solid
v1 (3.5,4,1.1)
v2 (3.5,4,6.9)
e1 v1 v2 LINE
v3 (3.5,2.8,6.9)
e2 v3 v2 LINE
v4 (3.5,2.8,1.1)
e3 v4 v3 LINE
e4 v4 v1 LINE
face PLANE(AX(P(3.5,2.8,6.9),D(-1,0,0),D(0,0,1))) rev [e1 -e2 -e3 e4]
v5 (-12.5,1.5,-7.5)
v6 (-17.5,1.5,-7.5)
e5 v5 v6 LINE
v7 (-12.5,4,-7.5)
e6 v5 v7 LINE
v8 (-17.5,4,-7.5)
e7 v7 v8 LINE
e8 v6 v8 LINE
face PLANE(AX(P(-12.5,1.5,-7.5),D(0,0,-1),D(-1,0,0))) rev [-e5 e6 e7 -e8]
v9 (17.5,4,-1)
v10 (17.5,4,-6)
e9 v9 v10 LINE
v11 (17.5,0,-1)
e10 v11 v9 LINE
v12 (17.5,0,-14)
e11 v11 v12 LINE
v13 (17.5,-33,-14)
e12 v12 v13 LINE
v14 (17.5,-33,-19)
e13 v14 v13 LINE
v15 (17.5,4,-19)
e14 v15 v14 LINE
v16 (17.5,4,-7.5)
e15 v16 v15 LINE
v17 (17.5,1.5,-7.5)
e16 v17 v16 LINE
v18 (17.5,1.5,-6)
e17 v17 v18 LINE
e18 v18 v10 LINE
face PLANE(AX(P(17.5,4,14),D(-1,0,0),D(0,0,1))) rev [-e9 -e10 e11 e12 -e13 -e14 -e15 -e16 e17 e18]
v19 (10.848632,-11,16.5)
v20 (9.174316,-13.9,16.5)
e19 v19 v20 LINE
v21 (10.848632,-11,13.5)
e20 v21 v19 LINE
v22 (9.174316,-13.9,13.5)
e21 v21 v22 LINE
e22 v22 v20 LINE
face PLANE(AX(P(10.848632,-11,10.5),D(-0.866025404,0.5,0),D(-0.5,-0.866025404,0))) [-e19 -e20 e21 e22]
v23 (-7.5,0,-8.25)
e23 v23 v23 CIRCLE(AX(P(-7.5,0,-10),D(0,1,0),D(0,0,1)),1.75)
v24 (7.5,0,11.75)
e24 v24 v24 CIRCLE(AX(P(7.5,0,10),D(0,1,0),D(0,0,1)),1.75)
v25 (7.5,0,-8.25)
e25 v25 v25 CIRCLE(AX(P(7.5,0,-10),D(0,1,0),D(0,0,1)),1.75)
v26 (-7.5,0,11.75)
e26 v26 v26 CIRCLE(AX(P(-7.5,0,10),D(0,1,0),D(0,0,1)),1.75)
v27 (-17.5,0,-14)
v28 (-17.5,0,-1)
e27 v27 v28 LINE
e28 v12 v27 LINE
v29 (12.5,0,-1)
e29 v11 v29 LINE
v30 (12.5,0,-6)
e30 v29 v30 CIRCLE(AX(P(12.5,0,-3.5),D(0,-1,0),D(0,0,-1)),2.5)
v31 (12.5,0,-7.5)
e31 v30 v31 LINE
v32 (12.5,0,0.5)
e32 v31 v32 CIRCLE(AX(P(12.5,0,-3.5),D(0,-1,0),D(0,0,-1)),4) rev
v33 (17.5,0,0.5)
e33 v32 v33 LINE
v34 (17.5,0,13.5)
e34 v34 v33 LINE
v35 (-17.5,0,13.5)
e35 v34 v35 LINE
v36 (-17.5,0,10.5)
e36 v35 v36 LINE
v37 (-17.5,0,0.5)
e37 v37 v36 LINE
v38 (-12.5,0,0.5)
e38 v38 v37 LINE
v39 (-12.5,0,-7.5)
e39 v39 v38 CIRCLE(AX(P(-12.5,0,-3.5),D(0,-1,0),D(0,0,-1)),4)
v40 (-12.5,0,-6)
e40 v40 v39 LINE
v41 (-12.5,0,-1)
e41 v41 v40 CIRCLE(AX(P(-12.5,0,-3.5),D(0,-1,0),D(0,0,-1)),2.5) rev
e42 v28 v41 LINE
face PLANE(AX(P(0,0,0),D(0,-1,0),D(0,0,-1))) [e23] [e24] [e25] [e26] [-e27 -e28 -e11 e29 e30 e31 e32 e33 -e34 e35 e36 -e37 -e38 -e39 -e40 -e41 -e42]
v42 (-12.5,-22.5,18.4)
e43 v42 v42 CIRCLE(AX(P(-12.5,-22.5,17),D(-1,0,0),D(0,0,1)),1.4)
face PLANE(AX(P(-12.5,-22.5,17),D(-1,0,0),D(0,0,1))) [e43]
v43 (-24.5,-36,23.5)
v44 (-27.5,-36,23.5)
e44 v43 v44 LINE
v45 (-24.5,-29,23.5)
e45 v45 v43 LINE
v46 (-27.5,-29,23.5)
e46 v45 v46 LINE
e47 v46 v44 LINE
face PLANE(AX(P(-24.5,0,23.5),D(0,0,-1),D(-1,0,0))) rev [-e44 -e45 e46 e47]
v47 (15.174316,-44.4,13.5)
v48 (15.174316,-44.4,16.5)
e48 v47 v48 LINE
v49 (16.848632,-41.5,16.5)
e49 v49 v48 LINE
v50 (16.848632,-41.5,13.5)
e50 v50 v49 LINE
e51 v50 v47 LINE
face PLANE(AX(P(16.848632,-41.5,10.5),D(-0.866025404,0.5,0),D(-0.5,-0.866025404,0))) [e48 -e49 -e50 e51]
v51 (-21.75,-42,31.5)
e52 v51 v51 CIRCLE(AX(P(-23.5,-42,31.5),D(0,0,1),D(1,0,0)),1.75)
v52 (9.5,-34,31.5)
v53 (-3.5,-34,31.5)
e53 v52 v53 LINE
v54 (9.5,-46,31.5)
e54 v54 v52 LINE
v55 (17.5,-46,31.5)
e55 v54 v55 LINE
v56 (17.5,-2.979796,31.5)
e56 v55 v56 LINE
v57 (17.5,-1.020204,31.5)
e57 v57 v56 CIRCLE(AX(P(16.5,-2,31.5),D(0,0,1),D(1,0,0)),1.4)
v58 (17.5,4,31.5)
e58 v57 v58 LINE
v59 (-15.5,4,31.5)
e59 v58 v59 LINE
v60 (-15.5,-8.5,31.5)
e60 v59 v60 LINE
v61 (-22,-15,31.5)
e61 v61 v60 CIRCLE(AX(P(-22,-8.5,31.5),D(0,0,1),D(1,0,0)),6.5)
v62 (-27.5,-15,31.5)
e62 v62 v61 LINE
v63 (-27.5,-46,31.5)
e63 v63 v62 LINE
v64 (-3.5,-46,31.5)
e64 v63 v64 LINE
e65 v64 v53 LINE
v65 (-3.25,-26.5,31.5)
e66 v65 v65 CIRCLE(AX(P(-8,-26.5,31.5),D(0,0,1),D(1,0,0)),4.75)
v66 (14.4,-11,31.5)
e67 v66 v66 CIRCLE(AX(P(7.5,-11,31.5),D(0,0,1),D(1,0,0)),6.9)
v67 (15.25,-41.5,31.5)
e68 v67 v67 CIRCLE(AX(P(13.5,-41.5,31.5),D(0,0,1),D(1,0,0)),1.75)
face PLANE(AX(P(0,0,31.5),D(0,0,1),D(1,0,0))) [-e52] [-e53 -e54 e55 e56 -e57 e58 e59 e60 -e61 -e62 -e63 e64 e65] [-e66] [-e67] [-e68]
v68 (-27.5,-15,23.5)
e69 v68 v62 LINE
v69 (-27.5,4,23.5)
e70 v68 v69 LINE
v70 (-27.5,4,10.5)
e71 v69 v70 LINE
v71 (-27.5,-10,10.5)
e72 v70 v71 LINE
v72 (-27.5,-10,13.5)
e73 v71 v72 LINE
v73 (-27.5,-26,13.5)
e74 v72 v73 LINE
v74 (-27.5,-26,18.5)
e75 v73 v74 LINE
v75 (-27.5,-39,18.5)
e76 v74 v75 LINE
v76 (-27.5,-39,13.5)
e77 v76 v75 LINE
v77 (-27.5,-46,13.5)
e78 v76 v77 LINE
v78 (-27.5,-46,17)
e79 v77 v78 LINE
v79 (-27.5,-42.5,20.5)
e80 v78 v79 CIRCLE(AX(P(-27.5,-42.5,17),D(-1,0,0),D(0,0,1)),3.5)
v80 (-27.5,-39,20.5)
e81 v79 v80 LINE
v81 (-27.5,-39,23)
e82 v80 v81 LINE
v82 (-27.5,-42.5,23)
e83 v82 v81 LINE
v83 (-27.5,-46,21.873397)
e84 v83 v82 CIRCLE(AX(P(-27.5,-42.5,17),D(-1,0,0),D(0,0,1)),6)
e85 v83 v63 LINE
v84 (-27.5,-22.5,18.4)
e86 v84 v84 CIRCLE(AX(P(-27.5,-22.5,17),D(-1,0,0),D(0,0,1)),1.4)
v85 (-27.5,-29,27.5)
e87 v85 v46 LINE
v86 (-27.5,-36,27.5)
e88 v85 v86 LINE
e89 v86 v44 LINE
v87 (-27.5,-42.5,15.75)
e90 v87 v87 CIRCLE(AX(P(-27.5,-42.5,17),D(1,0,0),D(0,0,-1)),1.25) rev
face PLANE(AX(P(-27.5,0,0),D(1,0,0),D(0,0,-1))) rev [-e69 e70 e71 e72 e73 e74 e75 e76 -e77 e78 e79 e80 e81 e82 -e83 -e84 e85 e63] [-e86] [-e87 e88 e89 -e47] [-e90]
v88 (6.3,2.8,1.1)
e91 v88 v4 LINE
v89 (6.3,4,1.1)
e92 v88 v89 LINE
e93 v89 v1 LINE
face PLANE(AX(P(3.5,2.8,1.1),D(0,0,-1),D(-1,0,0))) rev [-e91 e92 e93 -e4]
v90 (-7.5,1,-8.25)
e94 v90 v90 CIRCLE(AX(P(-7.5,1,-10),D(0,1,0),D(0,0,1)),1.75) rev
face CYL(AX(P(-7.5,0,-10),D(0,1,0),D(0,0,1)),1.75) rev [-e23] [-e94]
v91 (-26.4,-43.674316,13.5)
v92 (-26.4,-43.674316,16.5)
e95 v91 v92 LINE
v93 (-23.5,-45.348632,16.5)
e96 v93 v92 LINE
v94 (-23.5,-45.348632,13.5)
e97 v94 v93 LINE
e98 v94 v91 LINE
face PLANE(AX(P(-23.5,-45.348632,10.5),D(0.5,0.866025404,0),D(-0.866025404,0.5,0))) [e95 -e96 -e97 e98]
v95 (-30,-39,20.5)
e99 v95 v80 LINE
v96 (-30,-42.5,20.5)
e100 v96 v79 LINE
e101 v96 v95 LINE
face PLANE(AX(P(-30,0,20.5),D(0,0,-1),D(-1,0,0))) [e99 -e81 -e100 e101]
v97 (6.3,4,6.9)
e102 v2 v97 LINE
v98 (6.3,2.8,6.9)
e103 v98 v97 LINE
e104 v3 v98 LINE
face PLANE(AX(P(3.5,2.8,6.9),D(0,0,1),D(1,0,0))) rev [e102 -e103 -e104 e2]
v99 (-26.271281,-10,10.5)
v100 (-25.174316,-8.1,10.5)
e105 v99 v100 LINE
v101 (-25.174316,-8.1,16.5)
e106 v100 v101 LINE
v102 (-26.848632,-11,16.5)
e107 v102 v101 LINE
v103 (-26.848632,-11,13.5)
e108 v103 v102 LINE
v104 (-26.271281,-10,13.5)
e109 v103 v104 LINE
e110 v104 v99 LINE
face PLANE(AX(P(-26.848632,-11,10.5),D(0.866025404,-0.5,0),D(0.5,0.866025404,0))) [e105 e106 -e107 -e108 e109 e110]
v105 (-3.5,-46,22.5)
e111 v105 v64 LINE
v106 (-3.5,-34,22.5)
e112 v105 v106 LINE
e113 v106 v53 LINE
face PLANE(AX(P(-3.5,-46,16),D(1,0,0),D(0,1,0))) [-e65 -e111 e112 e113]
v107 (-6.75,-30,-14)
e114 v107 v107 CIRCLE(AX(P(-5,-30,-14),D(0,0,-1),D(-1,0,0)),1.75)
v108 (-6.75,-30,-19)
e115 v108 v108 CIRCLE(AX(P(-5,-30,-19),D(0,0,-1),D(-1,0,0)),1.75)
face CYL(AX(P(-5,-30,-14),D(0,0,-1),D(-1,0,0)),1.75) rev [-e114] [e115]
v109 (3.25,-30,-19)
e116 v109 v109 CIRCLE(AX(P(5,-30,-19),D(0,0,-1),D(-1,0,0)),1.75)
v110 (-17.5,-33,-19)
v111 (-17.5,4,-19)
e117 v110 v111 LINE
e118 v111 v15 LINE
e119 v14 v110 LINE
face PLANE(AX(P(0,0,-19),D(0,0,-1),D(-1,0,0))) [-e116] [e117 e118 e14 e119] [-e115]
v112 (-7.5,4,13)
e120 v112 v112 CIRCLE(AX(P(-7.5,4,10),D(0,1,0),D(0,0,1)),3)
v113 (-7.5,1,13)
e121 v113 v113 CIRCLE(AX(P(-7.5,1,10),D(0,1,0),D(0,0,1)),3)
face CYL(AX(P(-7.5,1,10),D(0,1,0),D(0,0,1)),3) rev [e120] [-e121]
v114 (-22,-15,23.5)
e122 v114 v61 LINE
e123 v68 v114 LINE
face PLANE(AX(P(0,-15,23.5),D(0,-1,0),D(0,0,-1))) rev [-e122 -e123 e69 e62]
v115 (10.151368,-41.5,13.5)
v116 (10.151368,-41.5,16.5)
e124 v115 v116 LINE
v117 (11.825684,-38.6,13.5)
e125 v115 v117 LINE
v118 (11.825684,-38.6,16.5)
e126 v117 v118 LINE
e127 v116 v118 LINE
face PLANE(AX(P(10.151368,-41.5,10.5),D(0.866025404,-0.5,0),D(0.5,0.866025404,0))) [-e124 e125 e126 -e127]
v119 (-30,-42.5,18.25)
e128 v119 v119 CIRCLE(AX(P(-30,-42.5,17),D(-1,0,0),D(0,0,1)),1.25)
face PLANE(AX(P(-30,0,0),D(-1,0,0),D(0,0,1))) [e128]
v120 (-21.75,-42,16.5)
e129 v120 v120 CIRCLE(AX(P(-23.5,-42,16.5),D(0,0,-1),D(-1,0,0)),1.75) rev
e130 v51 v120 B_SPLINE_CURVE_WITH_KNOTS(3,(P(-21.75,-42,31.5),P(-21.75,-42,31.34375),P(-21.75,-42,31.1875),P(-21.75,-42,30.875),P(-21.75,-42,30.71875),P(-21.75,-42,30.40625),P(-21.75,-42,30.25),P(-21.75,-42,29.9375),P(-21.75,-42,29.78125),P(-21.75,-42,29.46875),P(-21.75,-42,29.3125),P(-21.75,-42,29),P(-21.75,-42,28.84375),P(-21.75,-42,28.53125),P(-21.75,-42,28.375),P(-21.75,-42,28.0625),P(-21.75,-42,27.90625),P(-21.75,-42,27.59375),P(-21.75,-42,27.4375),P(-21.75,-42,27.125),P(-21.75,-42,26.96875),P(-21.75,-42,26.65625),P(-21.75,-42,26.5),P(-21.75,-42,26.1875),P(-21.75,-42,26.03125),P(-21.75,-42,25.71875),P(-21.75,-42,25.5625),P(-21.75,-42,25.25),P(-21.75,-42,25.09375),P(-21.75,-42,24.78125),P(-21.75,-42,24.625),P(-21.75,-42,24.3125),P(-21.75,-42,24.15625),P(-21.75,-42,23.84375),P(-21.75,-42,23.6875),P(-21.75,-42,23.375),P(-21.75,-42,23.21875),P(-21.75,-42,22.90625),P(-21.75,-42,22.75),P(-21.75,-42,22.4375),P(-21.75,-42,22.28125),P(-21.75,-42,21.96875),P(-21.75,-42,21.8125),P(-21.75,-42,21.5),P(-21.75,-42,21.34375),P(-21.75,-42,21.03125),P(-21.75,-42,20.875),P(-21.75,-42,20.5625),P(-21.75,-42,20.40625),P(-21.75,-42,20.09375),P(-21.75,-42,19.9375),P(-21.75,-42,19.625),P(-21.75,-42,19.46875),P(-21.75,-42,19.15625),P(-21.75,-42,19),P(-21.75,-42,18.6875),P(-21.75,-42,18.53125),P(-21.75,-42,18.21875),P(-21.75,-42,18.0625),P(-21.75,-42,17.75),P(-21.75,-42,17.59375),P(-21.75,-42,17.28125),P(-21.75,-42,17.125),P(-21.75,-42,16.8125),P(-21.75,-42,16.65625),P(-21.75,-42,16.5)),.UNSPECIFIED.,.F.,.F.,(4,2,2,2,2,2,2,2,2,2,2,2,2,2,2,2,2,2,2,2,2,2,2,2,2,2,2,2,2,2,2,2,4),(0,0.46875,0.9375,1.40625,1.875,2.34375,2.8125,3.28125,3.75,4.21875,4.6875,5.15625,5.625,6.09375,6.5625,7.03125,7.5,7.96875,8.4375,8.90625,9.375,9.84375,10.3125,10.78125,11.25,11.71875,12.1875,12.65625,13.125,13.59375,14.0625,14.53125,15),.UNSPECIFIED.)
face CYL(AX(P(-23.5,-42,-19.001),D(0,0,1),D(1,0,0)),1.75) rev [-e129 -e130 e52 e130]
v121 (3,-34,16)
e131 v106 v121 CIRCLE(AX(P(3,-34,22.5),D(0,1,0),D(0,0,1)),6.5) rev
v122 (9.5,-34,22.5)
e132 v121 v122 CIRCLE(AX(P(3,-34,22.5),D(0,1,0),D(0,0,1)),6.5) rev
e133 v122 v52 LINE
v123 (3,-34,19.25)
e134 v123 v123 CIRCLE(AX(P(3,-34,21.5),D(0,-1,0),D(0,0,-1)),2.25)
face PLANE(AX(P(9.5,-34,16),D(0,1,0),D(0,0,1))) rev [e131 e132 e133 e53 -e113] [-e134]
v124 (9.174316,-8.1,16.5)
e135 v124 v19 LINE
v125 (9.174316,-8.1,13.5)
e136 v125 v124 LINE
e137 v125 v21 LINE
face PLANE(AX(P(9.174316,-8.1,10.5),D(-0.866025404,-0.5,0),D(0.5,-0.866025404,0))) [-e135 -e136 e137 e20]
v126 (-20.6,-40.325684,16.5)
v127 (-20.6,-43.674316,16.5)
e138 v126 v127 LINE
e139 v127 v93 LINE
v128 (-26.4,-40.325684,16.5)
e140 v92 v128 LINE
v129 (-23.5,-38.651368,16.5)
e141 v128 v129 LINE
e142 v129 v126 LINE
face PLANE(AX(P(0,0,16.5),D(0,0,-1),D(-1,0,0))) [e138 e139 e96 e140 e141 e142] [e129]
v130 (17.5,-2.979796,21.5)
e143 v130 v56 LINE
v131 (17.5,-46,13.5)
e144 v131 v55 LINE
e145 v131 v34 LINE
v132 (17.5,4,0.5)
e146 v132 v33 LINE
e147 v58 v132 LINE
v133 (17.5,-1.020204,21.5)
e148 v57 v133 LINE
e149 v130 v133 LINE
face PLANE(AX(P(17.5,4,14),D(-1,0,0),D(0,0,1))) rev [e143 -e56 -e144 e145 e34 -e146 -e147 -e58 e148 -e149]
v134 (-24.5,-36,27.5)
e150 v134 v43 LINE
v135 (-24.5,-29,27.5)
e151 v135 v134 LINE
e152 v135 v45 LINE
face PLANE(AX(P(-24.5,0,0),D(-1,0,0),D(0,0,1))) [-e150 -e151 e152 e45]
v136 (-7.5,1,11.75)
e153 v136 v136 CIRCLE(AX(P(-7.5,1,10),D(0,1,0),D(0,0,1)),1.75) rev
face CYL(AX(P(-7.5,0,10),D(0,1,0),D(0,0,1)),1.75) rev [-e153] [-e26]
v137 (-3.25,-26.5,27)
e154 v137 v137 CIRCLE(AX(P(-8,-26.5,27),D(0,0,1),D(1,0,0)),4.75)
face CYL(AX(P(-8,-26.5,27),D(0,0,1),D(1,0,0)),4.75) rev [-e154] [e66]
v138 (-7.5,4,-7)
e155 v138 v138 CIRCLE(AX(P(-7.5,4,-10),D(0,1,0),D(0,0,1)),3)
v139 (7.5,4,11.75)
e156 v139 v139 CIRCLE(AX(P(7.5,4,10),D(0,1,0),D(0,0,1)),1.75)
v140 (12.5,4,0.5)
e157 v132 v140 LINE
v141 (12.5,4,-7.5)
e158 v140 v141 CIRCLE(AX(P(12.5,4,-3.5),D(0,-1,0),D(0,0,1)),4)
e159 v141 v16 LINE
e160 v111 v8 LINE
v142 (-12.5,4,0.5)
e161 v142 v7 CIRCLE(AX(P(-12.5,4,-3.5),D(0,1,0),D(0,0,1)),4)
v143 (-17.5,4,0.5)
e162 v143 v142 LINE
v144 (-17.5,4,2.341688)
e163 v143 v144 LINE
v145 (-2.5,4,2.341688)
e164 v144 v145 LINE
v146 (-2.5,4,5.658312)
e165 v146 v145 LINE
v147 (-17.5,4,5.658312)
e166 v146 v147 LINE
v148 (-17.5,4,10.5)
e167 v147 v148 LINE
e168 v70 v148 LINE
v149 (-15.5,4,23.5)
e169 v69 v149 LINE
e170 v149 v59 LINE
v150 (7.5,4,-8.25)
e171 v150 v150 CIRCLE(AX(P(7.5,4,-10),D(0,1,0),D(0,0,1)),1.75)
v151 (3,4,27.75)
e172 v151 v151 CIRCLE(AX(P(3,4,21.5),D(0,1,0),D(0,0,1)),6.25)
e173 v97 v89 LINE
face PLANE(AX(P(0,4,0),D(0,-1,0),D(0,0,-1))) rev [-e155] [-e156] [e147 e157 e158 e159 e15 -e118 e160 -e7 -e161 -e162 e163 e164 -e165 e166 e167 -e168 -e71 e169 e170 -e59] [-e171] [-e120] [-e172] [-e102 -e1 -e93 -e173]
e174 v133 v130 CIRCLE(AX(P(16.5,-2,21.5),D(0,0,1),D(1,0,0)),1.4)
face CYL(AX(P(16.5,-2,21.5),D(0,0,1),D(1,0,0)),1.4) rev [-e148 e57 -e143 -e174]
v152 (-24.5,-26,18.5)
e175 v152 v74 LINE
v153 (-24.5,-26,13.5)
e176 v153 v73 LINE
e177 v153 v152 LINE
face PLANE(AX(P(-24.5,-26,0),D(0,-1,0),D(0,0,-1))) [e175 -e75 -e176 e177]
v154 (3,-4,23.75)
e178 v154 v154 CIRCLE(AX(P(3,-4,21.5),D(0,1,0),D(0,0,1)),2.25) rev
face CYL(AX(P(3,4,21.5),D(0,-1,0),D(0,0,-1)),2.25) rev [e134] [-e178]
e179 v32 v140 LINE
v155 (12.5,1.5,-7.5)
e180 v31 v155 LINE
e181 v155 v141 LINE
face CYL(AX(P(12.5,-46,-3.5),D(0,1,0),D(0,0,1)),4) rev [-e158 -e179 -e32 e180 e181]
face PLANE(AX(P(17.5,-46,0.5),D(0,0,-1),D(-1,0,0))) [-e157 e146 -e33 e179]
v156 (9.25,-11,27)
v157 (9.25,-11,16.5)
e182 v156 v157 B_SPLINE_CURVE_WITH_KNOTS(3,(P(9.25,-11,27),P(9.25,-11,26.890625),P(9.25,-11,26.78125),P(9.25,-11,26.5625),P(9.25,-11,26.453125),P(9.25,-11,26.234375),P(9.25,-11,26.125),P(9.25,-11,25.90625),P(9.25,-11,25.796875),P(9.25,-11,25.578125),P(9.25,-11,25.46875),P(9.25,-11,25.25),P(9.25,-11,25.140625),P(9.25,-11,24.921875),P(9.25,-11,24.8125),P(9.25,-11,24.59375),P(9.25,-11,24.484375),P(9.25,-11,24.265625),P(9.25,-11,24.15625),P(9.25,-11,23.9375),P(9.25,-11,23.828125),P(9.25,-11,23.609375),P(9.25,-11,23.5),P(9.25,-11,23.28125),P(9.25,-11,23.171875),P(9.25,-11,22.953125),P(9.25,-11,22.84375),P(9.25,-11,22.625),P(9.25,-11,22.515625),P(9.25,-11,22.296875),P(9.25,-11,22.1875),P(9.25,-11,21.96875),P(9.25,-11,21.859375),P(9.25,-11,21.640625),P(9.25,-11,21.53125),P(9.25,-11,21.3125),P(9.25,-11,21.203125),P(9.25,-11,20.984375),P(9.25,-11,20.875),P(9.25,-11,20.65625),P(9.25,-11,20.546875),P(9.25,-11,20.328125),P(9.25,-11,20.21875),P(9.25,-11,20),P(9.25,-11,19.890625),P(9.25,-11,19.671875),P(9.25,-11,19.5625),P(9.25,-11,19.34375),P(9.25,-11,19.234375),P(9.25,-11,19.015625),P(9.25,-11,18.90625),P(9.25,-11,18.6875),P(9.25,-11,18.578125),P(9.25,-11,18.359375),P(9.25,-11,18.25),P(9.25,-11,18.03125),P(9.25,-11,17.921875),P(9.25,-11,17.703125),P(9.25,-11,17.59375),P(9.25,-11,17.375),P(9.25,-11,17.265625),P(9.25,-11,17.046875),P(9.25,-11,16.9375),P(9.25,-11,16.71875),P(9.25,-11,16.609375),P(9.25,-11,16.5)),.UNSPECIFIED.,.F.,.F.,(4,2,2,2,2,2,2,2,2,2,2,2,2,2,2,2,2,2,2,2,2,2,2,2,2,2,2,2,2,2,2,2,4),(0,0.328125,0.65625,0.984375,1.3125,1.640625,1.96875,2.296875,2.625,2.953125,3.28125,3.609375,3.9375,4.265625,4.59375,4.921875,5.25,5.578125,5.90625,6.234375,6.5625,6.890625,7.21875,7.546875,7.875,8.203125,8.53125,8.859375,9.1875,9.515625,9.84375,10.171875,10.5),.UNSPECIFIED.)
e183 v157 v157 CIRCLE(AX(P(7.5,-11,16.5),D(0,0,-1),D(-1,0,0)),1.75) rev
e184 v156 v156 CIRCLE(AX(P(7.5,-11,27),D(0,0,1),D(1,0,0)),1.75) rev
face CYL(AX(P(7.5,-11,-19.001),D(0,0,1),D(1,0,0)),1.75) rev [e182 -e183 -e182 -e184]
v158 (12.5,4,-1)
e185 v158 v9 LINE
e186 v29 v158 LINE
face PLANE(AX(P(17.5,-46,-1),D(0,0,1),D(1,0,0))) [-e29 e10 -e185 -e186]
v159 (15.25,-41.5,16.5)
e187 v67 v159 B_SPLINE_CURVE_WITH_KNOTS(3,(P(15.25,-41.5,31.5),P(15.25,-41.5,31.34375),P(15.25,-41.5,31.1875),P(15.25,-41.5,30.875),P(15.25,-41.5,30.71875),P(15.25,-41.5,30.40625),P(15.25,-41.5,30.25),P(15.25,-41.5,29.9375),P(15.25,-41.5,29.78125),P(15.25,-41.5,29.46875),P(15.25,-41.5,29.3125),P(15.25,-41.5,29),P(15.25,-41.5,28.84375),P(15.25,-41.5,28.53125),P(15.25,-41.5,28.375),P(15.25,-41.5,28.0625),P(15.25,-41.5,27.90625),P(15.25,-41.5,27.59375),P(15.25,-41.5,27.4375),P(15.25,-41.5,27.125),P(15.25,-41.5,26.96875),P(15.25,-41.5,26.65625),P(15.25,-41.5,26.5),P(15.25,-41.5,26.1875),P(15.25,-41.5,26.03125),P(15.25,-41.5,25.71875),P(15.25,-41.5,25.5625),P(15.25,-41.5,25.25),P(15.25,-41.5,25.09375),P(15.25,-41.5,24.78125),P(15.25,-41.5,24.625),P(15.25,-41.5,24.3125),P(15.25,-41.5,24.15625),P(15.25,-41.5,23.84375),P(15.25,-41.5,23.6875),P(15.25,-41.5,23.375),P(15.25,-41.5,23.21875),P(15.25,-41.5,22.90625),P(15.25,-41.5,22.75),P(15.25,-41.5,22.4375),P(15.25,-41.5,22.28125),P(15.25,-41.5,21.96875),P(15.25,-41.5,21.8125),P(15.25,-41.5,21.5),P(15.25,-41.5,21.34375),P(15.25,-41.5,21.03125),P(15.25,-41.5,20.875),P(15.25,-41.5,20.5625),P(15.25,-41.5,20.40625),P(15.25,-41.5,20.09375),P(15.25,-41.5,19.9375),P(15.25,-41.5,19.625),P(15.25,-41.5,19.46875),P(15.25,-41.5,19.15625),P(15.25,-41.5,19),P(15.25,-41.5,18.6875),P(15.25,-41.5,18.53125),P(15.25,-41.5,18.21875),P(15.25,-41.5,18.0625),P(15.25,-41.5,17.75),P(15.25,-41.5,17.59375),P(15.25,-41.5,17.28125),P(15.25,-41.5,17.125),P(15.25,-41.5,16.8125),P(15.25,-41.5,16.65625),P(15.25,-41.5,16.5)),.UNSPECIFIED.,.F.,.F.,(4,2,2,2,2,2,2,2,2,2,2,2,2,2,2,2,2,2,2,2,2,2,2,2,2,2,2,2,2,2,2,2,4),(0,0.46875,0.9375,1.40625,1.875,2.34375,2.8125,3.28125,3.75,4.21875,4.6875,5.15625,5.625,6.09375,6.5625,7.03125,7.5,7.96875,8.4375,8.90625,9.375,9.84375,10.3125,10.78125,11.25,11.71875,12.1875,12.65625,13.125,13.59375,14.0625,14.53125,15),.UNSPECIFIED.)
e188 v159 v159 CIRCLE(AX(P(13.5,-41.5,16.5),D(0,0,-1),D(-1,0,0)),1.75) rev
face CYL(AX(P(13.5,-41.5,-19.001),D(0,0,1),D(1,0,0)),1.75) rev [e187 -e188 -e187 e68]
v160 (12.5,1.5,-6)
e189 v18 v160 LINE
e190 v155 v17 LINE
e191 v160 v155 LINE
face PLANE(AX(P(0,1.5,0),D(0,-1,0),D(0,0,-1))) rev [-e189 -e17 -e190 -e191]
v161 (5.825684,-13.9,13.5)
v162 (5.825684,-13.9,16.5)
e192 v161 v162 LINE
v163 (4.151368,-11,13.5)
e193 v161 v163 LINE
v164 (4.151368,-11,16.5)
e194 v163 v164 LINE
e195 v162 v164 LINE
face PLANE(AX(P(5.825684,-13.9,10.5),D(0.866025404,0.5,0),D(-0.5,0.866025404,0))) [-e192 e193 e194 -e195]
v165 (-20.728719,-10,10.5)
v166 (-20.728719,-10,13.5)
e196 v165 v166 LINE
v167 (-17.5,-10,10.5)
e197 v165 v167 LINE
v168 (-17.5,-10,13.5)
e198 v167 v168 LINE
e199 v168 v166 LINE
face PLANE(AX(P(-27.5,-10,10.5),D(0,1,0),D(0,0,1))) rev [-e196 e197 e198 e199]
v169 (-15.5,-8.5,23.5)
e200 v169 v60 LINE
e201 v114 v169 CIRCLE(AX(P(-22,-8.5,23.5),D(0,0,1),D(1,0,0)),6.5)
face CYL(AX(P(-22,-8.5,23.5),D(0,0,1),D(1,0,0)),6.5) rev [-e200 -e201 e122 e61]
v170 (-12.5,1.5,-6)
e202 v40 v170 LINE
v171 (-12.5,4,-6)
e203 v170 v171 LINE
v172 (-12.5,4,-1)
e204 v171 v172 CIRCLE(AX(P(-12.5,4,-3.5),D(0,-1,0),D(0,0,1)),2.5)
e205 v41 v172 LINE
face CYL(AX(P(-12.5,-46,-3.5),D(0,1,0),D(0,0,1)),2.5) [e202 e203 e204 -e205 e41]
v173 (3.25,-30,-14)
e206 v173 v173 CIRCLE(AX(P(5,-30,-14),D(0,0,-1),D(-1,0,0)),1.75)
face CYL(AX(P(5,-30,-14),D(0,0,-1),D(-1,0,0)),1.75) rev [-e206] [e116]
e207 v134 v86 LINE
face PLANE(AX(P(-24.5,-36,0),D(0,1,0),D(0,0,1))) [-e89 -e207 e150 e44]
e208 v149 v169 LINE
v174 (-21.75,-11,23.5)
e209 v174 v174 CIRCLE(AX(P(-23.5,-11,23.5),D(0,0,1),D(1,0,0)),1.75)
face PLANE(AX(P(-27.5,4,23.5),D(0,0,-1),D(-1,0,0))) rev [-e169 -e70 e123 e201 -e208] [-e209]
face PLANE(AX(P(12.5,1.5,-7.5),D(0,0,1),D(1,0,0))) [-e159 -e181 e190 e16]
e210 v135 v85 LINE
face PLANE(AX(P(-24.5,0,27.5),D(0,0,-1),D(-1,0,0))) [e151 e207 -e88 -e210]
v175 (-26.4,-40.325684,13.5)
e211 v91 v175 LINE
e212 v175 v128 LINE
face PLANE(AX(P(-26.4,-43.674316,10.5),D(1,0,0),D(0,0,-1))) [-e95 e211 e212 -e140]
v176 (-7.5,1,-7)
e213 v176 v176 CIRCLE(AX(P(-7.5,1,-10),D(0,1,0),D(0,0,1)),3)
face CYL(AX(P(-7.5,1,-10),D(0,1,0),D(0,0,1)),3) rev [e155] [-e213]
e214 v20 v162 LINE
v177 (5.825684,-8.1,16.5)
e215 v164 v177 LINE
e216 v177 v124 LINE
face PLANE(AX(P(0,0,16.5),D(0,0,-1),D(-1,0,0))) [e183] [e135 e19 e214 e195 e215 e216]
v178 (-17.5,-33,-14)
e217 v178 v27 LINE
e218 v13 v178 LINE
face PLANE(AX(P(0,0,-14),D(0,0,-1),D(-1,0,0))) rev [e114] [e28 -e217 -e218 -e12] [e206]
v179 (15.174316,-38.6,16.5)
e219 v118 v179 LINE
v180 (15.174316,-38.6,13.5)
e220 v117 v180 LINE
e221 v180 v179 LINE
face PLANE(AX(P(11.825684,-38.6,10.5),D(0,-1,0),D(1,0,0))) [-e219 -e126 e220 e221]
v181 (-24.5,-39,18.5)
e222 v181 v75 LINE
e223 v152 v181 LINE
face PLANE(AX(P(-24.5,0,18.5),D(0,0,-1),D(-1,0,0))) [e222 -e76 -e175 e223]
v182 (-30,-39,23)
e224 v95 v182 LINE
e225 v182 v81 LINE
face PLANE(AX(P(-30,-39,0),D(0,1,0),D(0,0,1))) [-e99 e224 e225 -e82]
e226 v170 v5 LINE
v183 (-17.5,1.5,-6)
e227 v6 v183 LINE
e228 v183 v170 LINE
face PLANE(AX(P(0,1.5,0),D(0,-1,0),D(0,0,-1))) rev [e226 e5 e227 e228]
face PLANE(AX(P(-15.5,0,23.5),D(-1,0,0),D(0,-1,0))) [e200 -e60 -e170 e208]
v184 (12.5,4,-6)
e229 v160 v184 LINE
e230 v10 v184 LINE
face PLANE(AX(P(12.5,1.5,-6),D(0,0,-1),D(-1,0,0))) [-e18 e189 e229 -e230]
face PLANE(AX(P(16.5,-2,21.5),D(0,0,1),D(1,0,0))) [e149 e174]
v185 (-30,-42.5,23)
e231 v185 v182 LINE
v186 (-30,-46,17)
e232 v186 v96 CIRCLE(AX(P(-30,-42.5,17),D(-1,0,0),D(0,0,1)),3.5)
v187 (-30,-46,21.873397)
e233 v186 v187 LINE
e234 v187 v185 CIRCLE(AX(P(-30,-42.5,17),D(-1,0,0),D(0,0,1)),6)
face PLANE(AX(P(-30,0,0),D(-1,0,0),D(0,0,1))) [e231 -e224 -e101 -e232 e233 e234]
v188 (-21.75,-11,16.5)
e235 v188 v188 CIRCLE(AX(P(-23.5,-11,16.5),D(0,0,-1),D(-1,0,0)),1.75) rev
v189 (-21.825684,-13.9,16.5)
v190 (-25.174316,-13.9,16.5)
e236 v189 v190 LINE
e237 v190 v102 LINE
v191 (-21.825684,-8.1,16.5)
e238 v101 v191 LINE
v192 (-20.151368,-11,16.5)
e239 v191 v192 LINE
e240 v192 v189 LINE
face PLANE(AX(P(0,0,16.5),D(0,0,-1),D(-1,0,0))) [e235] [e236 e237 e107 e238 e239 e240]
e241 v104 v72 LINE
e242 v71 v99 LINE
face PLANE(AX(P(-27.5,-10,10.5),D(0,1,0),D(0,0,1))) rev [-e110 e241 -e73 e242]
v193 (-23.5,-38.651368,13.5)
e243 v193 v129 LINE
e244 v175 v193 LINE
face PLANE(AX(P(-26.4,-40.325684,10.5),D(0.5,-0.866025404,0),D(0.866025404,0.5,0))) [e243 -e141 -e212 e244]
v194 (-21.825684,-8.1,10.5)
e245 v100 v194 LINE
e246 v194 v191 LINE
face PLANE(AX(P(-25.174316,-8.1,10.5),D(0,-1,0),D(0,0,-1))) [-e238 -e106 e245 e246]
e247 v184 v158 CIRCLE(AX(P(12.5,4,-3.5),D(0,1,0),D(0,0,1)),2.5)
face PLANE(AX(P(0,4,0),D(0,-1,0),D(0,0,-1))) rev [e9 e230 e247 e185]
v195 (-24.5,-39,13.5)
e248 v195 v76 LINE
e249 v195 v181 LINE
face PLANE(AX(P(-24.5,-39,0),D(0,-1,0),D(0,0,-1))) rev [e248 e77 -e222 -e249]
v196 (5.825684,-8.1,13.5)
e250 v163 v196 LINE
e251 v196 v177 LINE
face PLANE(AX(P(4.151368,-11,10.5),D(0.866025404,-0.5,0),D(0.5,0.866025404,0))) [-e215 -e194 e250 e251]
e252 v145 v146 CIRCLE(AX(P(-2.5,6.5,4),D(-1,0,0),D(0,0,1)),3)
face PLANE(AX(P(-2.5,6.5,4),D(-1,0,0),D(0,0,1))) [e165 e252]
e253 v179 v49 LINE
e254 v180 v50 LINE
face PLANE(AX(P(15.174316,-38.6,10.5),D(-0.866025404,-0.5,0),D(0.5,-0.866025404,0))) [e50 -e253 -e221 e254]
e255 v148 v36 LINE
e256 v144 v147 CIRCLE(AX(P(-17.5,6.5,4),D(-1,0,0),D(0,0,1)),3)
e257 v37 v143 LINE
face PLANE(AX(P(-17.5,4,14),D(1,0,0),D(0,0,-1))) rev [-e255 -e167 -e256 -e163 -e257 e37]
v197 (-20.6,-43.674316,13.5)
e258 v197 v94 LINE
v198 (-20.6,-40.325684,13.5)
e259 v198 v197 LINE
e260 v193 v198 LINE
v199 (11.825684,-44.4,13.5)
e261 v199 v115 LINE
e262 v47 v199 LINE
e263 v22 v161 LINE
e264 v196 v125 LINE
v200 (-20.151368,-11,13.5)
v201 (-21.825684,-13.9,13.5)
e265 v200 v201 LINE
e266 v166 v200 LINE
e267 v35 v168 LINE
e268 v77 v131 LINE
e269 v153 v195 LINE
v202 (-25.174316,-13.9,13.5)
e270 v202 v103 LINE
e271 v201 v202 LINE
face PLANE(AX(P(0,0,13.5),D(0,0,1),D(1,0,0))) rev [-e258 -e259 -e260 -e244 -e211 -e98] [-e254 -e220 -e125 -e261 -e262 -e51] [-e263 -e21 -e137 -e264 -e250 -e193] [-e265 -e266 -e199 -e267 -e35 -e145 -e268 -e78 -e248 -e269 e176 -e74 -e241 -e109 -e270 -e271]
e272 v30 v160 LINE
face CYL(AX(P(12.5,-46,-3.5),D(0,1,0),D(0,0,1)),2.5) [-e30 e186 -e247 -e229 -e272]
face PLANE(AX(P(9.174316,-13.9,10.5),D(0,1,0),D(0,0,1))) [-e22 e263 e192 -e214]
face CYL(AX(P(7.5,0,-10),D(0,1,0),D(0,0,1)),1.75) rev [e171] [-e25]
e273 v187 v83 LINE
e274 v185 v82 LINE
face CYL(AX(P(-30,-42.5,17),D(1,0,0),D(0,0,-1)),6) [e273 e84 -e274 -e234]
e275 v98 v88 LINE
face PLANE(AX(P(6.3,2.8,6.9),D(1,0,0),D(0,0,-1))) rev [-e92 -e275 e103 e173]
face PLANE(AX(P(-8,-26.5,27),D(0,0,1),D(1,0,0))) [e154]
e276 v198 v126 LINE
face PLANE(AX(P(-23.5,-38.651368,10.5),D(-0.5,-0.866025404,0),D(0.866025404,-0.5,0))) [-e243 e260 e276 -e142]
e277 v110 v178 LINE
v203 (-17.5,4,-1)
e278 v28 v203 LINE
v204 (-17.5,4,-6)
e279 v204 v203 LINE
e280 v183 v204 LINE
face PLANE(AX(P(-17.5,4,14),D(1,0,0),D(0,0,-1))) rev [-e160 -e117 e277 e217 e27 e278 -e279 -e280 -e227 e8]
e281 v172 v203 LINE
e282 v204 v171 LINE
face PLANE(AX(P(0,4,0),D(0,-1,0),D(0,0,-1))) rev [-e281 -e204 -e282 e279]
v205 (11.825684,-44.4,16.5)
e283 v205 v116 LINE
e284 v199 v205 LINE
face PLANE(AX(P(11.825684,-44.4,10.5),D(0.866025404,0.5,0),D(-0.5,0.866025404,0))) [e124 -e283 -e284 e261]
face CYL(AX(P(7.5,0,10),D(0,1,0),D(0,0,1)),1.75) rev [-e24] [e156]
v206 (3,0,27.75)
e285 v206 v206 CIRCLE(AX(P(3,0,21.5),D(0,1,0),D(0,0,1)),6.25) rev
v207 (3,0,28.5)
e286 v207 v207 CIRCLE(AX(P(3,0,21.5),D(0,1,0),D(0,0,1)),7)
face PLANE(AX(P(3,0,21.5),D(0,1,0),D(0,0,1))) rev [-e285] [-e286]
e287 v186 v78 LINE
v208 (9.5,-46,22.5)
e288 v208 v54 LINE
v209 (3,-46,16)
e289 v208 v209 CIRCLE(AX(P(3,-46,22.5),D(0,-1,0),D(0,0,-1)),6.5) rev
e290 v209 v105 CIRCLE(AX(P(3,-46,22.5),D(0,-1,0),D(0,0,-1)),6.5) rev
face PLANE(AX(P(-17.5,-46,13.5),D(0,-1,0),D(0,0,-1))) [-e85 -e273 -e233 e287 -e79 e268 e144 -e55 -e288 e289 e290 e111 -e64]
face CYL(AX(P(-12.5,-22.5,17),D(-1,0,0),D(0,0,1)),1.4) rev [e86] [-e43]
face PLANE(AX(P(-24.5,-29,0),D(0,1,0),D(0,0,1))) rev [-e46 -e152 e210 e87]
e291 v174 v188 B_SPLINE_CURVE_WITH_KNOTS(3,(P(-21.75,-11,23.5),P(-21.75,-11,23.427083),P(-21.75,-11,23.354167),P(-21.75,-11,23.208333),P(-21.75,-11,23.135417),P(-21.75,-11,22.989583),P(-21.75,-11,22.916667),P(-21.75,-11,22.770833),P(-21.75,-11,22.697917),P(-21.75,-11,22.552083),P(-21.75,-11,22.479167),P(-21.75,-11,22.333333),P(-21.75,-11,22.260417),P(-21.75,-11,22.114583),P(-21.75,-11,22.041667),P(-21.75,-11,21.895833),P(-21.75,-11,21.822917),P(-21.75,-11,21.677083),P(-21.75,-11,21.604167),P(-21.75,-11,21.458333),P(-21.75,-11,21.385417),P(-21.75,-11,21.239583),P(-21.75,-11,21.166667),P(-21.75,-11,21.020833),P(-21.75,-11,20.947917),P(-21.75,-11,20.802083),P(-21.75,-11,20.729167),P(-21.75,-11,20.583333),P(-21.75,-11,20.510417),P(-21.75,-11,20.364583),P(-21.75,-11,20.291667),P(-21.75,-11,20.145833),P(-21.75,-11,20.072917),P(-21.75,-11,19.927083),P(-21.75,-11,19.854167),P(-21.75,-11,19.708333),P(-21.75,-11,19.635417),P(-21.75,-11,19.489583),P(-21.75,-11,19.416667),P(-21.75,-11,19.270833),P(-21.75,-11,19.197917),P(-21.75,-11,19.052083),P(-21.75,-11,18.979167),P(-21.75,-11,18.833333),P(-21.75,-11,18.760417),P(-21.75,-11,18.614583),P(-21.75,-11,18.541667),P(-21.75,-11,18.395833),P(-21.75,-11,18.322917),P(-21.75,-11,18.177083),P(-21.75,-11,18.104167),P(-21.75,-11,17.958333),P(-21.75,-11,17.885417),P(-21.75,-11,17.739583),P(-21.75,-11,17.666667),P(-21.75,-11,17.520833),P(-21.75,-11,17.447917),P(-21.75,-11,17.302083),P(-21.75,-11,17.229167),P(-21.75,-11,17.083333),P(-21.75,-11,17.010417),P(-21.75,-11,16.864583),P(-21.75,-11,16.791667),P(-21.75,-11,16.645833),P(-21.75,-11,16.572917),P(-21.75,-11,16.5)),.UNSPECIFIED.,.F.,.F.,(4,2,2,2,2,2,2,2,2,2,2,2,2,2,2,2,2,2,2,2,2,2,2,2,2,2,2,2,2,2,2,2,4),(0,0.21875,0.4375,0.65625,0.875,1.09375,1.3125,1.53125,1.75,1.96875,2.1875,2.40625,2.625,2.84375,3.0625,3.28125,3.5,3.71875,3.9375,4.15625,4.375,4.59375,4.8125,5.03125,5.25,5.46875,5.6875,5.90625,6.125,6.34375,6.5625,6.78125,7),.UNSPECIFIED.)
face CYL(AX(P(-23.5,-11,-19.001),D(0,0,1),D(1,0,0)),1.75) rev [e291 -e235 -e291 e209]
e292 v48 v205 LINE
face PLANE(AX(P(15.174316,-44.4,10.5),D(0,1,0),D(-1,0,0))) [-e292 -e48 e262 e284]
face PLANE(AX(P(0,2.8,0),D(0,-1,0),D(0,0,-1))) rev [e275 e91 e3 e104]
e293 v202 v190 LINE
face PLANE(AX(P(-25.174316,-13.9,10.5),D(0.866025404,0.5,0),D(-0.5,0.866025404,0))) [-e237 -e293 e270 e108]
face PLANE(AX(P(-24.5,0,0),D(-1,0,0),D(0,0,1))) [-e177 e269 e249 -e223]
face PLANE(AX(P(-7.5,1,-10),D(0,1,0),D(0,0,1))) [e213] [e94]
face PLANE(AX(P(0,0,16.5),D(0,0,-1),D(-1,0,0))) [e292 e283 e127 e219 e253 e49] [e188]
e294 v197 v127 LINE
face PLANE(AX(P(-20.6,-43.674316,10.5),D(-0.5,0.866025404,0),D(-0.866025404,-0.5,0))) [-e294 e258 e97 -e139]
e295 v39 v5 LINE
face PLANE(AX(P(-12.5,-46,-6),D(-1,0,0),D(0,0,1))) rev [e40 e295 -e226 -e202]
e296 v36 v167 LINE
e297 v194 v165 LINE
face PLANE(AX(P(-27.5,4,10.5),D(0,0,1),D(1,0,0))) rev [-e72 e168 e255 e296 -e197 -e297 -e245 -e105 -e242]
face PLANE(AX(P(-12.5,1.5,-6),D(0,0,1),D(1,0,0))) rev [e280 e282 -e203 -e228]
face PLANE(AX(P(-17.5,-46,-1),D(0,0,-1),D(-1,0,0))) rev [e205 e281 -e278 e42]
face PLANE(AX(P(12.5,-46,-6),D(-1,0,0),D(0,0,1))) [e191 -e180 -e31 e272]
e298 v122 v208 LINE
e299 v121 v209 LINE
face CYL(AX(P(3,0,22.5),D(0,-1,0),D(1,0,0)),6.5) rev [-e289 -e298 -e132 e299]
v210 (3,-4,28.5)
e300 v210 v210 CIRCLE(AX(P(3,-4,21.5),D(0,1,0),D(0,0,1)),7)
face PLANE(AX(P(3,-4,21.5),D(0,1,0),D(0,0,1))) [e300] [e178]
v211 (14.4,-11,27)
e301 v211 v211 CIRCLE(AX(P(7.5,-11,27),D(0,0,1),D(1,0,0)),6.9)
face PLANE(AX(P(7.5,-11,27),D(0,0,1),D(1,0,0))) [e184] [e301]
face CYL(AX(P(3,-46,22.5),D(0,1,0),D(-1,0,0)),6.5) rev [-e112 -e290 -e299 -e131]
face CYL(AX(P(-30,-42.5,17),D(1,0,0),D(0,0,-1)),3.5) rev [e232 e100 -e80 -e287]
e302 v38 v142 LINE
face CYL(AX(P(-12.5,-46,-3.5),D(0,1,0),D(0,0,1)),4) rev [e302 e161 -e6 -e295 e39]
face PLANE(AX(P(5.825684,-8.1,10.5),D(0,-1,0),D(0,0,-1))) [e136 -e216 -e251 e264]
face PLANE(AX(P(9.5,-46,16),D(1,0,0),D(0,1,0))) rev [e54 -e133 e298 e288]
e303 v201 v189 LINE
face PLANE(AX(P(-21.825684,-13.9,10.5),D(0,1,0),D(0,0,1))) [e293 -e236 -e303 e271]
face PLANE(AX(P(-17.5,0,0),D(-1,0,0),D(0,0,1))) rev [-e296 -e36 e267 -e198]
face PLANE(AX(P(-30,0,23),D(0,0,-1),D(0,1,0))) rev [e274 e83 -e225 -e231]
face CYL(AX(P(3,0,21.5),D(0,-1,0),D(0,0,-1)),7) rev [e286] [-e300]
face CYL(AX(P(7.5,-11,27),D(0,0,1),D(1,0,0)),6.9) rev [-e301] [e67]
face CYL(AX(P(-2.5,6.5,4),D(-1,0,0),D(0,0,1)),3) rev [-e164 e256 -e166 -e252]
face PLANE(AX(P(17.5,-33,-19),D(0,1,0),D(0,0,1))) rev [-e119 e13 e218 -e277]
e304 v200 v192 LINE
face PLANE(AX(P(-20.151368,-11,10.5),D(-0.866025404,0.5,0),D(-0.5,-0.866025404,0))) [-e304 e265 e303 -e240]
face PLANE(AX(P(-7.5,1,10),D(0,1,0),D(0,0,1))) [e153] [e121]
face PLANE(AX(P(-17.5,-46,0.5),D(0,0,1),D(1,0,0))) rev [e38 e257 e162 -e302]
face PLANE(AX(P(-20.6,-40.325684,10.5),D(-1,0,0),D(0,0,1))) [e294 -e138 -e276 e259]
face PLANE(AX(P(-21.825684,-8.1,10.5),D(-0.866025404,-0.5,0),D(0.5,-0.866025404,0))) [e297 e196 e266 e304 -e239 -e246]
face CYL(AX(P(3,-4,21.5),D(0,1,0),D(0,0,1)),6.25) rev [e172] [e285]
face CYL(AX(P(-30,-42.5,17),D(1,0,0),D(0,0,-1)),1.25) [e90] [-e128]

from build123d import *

# Parameters (mm, degrees)
SKETCH1_W                = 35
SKETCH1_H                = 28
BOSS_EXTRUDE1_DEPTH      = 4
SKETCH2_R                = 1.75
CUT_EXTRUDE1_DEPTH       = 23.765104876
BOSS_EXTRUDE2_DEPTH      = 17.5
BOSS_EXTRUDE2_DEPTH_BACK = 0.5
SKETCH3_W                = 35
SKETCH3_H                = 50
SKETCH7_W                = 35
SKETCH7_H                = 37
BOSS_EXTRUDE3_DEPTH      = 5
SKETCH10_R               = 1.75
CUT_EXTRUDE6_DEPTH       = 5
SKETCH24_W               = 18
SKETCH24_H               = 46
BOSS_EXTRUDE4_DEPTH      = 10
SKETCH37_W               = 13
SKETCH37_H               = 14
BOSS_EXTRUDE9_DEPTH      = 10
CUT_EXTRUDE19_REACH      = 75.638
SKETCH22_R               = 1.75
SKETCH22_3_R             = 6.9
SKETCH22_3_R_2           = 4.75
CUT_EXTRUDE20_DEPTH      = 4.5
SKETCH22_5_R             = 1.75
SKETCH22_5_W             = 2
SKETCH22_5_H             = 4
CUT_EXTRUDE24_DEPTH      = 8
SKETCH22_4_W             = 13
SKETCH22_4_H             = 12
CUT_EXTRUDE21_DEPTH      = 15.5
FILLET3_R                = 6.5
SKETCH26_R               = 2.25
CUT_EXTRUDE22_DEPTH      = 57.502212346
SKETCH27_R               = 6.25
CUT_EXTRUDE23_DEPTH      = 8
CUT_EXTRUDE25_DEPTH      = 3
CUT_EXTRUDE25_DEPTH_BACK = 3
SKETCH30_R               = 3
CUT_EXTRUDE26_DEPTH      = 3
CUT_EXTRUDE27_DEPTH      = 66.180518562
SKETCH32_W               = 5
SKETCH32_H               = 1.5
CUT_EXTRUDE28_DEPTH      = 2.5
SKETCH33_R               = 3
CUT_EXTRUDE29_DEPTH      = 15
SKETCH34_W               = 2.8
SKETCH34_H               = 5.8
CUT_EXTRUDE30_DEPTH      = 1.2
SKETCH38_R               = 7
CUT_EXTRUDE31_DEPTH      = 4
SKETCH39_W               = 5
SKETCH39_H               = 13
SKETCH39_W_2             = 4
SKETCH39_H_2             = 7
CUT_EXTRUDE32_DEPTH      = 3
SKETCH40_R               = 1.4
CUT_EXTRUDE33_DEPTH      = 15
SKETCH41_R               = 1.25
BOSS_EXTRUDE10_DEPTH     = 2.5
SKETCH42_R               = 1.4
CUT_EXTRUDE34_DEPTH      = 10


with BuildPart() as part:
    # Sketch1 → Boss-Extrude1 (new body)
    with BuildSketch(Plane(origin=(0, 0, 0), x_dir=(1, 0, 0), z_dir=(0, 1, 0))):
        Rectangle(SKETCH1_W, SKETCH1_H)
    extrude(amount=BOSS_EXTRUDE1_DEPTH)

    # Sketch2 → Cut-Extrude1 (cut, through all)
    with BuildSketch(Plane(origin=(0, 4, 0), x_dir=(1, 0, 0), z_dir=(0, 1, 0))):
        with Locations(Location((-7.5, -10, 0), (0, 0, 270))):
            Circle(SKETCH2_R)
        with Locations(Location((-7.5, 10, 0), (0, 0, 270))):
            Circle(SKETCH2_R)
        with Locations(Location((7.5, -10, 0), (0, 0, 270))):
            Circle(SKETCH2_R)
        with Locations(Location((7.5, 10, 0), (0, 0, 270))):
            Circle(SKETCH2_R)
    extrude(amount=-CUT_EXTRUDE1_DEPTH, mode=Mode.SUBTRACT)

    # Sketch3 → Boss-Extrude2 (add, two sides: drawn at the far end of the back side and taken through both)
    with BuildSketch(Plane.XY.offset(14).offset(-BOSS_EXTRUDE2_DEPTH_BACK)):
        with Locations((0, -21)):
            Rectangle(SKETCH3_W, SKETCH3_H)
    extrude(amount=BOSS_EXTRUDE2_DEPTH + BOSS_EXTRUDE2_DEPTH_BACK)

    # Sketch7 → Boss-Extrude3 (add)
    with BuildSketch(Plane(origin=(0, 0, -14), x_dir=(-1, 0, 0), z_dir=(0, 0, -1))):
        with Locations((0, -14.5)):
            Rectangle(SKETCH7_W, SKETCH7_H)
    extrude(amount=BOSS_EXTRUDE3_DEPTH)

    # Sketch10 → Cut-Extrude6 (cut)
    with BuildSketch(Plane(origin=(0, 0, -19), x_dir=(-1, 0, 0), z_dir=(0, 0, -1))):
        with Locations((-5, -30)):
            Circle(SKETCH10_R)
        with Locations((5, -30)):
            Circle(SKETCH10_R)
    extrude(amount=-CUT_EXTRUDE6_DEPTH, mode=Mode.SUBTRACT)

    # Sketch24 → Boss-Extrude4 (add)
    with BuildSketch(Plane.ZY.offset(17.5)):
        with Locations((22.5, -23)):
            Rectangle(SKETCH24_W, SKETCH24_H)
    extrude(amount=BOSS_EXTRUDE4_DEPTH)

    # Sketch37 → Boss-Extrude9 (add)
    with BuildSketch(Plane.ZY.offset(17.5)):
        with Locations((17, -3)):
            Rectangle(SKETCH37_W, SKETCH37_H)
    extrude(amount=BOSS_EXTRUDE9_DEPTH)

    # Sketch22 → Cut-Extrude19 (cut, up to next)
    with BuildSketch(Plane.XY.offset(31.5), mode=Mode.PRIVATE) as cut_extrude19_sk1:
        with Locations((-23.5, -42)):
            Circle(SKETCH22_R)
    cut_extrude19_tool1 = extrude(cut_extrude19_sk1.sketch, amount=-CUT_EXTRUDE19_REACH, mode=Mode.PRIVATE) & part.part
    # Sketch22 → Cut-Extrude19 (cut, up to next)
    with BuildSketch(Plane.XY.offset(31.5), mode=Mode.PRIVATE) as cut_extrude19_sk2:
        with Locations((13.5, -41.5)):
            Circle(SKETCH22_R)
    cut_extrude19_tool2 = extrude(cut_extrude19_sk2.sketch, amount=-CUT_EXTRUDE19_REACH, mode=Mode.PRIVATE) & part.part
    # Sketch22 → Cut-Extrude19 (cut, up to next)
    with BuildSketch(Plane.XY.offset(31.5), mode=Mode.PRIVATE) as cut_extrude19_sk3:
        with Locations((7.5, -11)):
            Circle(SKETCH22_R)
    cut_extrude19_tool3 = extrude(cut_extrude19_sk3.sketch, amount=-CUT_EXTRUDE19_REACH, mode=Mode.PRIVATE) & part.part
    # Sketch22 → Cut-Extrude19 (cut, up to next)
    with BuildSketch(Plane.XY.offset(31.5), mode=Mode.PRIVATE) as cut_extrude19_sk4:
        with Locations((-23.5, -11)):
            Circle(SKETCH22_R)
    cut_extrude19_tool4 = extrude(cut_extrude19_sk4.sketch, amount=-CUT_EXTRUDE19_REACH, mode=Mode.PRIVATE) & part.part
    add(cut_extrude19_tool1.solids().sort_by_distance((-23.5, -42, 31.5))[0], mode=Mode.SUBTRACT)
    add(cut_extrude19_tool2.solids().sort_by_distance((13.5, -41.5, 31.5))[0], mode=Mode.SUBTRACT)
    add(cut_extrude19_tool3.solids().sort_by_distance((7.5, -11, 31.5))[0], mode=Mode.SUBTRACT)
    add(cut_extrude19_tool4.solids().sort_by_distance((-23.5, -11, 31.5))[0], mode=Mode.SUBTRACT)

    # Sketch22<3> → Cut-Extrude20 (cut)
    with BuildSketch(Plane.XY.offset(31.5)):
        with Locations((7.5, -11)):
            Circle(SKETCH22_3_R)
        with Locations((-8, -26.5)):
            Circle(SKETCH22_3_R_2)
    extrude(amount=-CUT_EXTRUDE20_DEPTH, mode=Mode.SUBTRACT)

    # Sketch22<5> → Cut-Extrude24 (cut)
    # profile 1 of 2: a face of its own
    with BuildSketch(Plane.XY.offset(31.5)):
        with BuildLine():
            Line((-15.5, -8.5), (-15.5, 0))
            Line((-15.5, 0), (-17.5, 0))
            Line((-17.5, 0), (-27.5, 0))
            Line((-27.5, 0), (-27.5, -15))
            Line((-27.5, -15), (-22, -15))
            ThreePointArc((-22, -15), (-17.403805922, -13.096194078), (-15.5, -8.5))
        make_face()
        with Locations((-23.5, -11)):
            Circle(SKETCH22_5_R, mode=Mode.SUBTRACT)
    # profile 2 of 2: a face of its own
    with BuildSketch(Plane.XY.offset(31.5)):
        with Locations((-16.5, 2)):
            Rectangle(SKETCH22_5_W, SKETCH22_5_H)
    extrude(amount=-CUT_EXTRUDE24_DEPTH, mode=Mode.SUBTRACT)

    # Sketch22<4> → Cut-Extrude21 (cut)
    with BuildSketch(Plane.XY.offset(31.5)):
        with Locations((3, -40)):
            Rectangle(SKETCH22_4_W, SKETCH22_4_H)
    extrude(amount=-CUT_EXTRUDE21_DEPTH, mode=Mode.SUBTRACT)

    # Fillet3
    fillet3_edges = [part.edges().sort_by_distance(p)[0] for p in [
        (9.5, -40, 16),
        (-3.5, -40, 16),
    ]]
    fillet(fillet3_edges, radius=FILLET3_R - 0.0001)  # a hair under: the kernel refuses the full size

    # Sketch26 → Cut-Extrude22 (cut, through all)
    with BuildSketch(Plane.XZ.offset(34)):
        with Locations(Location((3, 21.5, 0), (0, 0, 270))):
            Circle(SKETCH26_R)
    extrude(amount=-CUT_EXTRUDE22_DEPTH, mode=Mode.SUBTRACT)

    # Sketch27 → Cut-Extrude23 (cut)
    with BuildSketch(Plane(origin=(0, 4, 0), x_dir=(1, 0, 0), z_dir=(0, 1, 0))):
        with Locations(Location((3, -21.5, 0), (0, 0, 270))):
            Circle(SKETCH27_R)
    extrude(amount=-CUT_EXTRUDE23_DEPTH, mode=Mode.SUBTRACT)

    # Sketch29 → Cut-Extrude25 (cut, two sides: drawn at the far end of the back side and taken through both)
    with BuildSketch(Plane(origin=(0, 0, 13.5), x_dir=(-1, 0, 0), z_dir=(0, 0, -1)).offset(-CUT_EXTRUDE25_DEPTH_BACK)):
        Polygon((-4.151368439, -11), (-5.825684219, -8.1), (-9.174315781, -8.1), (-10.848631561, -11), (-9.174315781, -13.9), (-5.825684219, -13.9), align=None)
        Polygon((20.151368439, -11), (21.825684219, -13.9), (25.174315781, -13.9), (26.848631561, -11), (25.174315781, -8.1), (21.825684219, -8.1), align=None)
        Polygon((-10.151368439, -41.5), (-11.825684219, -38.6), (-15.174315781, -38.6), (-16.848631561, -41.5), (-15.174315781, -44.4), (-11.825684219, -44.4), align=None)
        Polygon((23.5, -45.348631561), (26.4, -43.674315781), (26.4, -40.325684219), (23.5, -38.651368439), (20.6, -40.325684219), (20.6, -43.674315781), align=None)
    extrude(amount=CUT_EXTRUDE25_DEPTH + CUT_EXTRUDE25_DEPTH_BACK, mode=Mode.SUBTRACT)

    # Sketch30 → Cut-Extrude26 (cut)
    with BuildSketch(Plane(origin=(0, 4, 0), x_dir=(1, 0, 0), z_dir=(0, 1, 0))):
        with Locations(Location((-7.5, 10, 0), (0, 0, 270))):
            Circle(SKETCH30_R)
        with Locations(Location((-7.5, -10, 0), (0, 0, 270))):
            Circle(SKETCH30_R)
    extrude(amount=-CUT_EXTRUDE26_DEPTH, mode=Mode.SUBTRACT)

    # Sketch31 → Cut-Extrude27 (cut, through all)
    with BuildSketch(Plane(origin=(0, 4, 0), x_dir=(1, 0, 0), z_dir=(0, 1, 0))):
        with BuildLine():
            Line((-17.5, 1), (-12.5, 1))
            ThreePointArc((-12.5, 1), (-10, 3.5), (-12.5, 6))
            Line((-12.5, 6), (-12.5, 7.5))
            ThreePointArc((-12.5, 7.5), (-8.5, 3.5), (-12.5, -0.5))
            Line((-12.5, -0.5), (-17.5, -0.5))
            Line((-17.5, -0.5), (-17.5, 1))
        make_face()
    cut_extrude27 = extrude(amount=-CUT_EXTRUDE27_DEPTH, mode=Mode.SUBTRACT)

    # Sketch32 → Cut-Extrude28 (cut)
    with BuildSketch(Plane(origin=(0, 4, 0), x_dir=(1, 0, 0), z_dir=(0, 1, 0))):
        with Locations((-15, 6.75)):
            Rectangle(SKETCH32_W, SKETCH32_H)
    cut_extrude28 = extrude(amount=-CUT_EXTRUDE28_DEPTH, mode=Mode.SUBTRACT)

    # Sketch33 → Cut-Extrude29 (cut)
    with BuildSketch(Plane.ZY.offset(17.5)):
        with Locations((4, 6.5)):
            Circle(SKETCH33_R)
    extrude(amount=-CUT_EXTRUDE29_DEPTH, mode=Mode.SUBTRACT)

    # Sketch34 → Cut-Extrude30 (cut)
    with BuildSketch(Plane(origin=(0, 4, 0), x_dir=(1, 0, 0), z_dir=(0, 1, 0))):
        with Locations((4.9, -4)):
            Rectangle(SKETCH34_W, SKETCH34_H)
    extrude(amount=-CUT_EXTRUDE30_DEPTH, mode=Mode.SUBTRACT)

    # Mirror1: Cut-Extrude27, Cut-Extrude28 across plane
    add(cut_extrude27.mirror(Plane.ZY), mode=Mode.SUBTRACT)
    add(cut_extrude28.mirror(Plane.ZY), mode=Mode.SUBTRACT)

    # Sketch38 → Cut-Extrude31 (cut)
    with BuildSketch(Plane(origin=(0, -4, 0), x_dir=(1, 0, 0), z_dir=(0, 1, 0))):
        with Locations(Location((3, -21.5, 0), (0, 0, 270))):
            Circle(SKETCH38_R)
    extrude(amount=CUT_EXTRUDE31_DEPTH, mode=Mode.SUBTRACT)

    # Sketch39 → Cut-Extrude32 (cut)
    with BuildSketch(Plane.ZY.offset(27.5)):
        with Locations((16, -32.5)):
            Rectangle(SKETCH39_W, SKETCH39_H)
        with Locations((25.5, -32.5)):
            Rectangle(SKETCH39_W_2, SKETCH39_H_2)
    extrude(amount=-CUT_EXTRUDE32_DEPTH, mode=Mode.SUBTRACT)

    # Sketch40 → Cut-Extrude33 (cut)
    with BuildSketch(Plane.ZY.offset(27.5)):
        with Locations((17, -22.5)):
            Circle(SKETCH40_R)
    extrude(amount=-CUT_EXTRUDE33_DEPTH, mode=Mode.SUBTRACT)

    # Sketch41 → Boss-Extrude10 (add)
    with BuildSketch(Plane.ZY.offset(27.5)):
        with Locations(Location((17, -42.5, 0), (0, 0, 180))):
            Circle(SKETCH41_R)
        with BuildLine():
            Line((20.5, -39), (20.5, -42.5))
            ThreePointArc((20.5, -42.5), (19.474873734, -44.974873734), (17, -46))
            Line((17, -46), (21.873397172, -46))
            ThreePointArc((21.873397172, -46), (22.711408891, -44.338425545), (23, -42.5))
            Line((23, -42.5), (23, -39))
            Line((23, -39), (20.5, -39))
        make_face()
    extrude(amount=BOSS_EXTRUDE10_DEPTH)

    # Sketch42 → Cut-Extrude34 (cut)
    with BuildSketch(Plane.XY.offset(31.5)):
        with Locations((16.5, -2)):
            Circle(SKETCH42_R)
    extrude(amount=-CUT_EXTRUDE34_DEPTH, mode=Mode.SUBTRACT)


solid = part.part
